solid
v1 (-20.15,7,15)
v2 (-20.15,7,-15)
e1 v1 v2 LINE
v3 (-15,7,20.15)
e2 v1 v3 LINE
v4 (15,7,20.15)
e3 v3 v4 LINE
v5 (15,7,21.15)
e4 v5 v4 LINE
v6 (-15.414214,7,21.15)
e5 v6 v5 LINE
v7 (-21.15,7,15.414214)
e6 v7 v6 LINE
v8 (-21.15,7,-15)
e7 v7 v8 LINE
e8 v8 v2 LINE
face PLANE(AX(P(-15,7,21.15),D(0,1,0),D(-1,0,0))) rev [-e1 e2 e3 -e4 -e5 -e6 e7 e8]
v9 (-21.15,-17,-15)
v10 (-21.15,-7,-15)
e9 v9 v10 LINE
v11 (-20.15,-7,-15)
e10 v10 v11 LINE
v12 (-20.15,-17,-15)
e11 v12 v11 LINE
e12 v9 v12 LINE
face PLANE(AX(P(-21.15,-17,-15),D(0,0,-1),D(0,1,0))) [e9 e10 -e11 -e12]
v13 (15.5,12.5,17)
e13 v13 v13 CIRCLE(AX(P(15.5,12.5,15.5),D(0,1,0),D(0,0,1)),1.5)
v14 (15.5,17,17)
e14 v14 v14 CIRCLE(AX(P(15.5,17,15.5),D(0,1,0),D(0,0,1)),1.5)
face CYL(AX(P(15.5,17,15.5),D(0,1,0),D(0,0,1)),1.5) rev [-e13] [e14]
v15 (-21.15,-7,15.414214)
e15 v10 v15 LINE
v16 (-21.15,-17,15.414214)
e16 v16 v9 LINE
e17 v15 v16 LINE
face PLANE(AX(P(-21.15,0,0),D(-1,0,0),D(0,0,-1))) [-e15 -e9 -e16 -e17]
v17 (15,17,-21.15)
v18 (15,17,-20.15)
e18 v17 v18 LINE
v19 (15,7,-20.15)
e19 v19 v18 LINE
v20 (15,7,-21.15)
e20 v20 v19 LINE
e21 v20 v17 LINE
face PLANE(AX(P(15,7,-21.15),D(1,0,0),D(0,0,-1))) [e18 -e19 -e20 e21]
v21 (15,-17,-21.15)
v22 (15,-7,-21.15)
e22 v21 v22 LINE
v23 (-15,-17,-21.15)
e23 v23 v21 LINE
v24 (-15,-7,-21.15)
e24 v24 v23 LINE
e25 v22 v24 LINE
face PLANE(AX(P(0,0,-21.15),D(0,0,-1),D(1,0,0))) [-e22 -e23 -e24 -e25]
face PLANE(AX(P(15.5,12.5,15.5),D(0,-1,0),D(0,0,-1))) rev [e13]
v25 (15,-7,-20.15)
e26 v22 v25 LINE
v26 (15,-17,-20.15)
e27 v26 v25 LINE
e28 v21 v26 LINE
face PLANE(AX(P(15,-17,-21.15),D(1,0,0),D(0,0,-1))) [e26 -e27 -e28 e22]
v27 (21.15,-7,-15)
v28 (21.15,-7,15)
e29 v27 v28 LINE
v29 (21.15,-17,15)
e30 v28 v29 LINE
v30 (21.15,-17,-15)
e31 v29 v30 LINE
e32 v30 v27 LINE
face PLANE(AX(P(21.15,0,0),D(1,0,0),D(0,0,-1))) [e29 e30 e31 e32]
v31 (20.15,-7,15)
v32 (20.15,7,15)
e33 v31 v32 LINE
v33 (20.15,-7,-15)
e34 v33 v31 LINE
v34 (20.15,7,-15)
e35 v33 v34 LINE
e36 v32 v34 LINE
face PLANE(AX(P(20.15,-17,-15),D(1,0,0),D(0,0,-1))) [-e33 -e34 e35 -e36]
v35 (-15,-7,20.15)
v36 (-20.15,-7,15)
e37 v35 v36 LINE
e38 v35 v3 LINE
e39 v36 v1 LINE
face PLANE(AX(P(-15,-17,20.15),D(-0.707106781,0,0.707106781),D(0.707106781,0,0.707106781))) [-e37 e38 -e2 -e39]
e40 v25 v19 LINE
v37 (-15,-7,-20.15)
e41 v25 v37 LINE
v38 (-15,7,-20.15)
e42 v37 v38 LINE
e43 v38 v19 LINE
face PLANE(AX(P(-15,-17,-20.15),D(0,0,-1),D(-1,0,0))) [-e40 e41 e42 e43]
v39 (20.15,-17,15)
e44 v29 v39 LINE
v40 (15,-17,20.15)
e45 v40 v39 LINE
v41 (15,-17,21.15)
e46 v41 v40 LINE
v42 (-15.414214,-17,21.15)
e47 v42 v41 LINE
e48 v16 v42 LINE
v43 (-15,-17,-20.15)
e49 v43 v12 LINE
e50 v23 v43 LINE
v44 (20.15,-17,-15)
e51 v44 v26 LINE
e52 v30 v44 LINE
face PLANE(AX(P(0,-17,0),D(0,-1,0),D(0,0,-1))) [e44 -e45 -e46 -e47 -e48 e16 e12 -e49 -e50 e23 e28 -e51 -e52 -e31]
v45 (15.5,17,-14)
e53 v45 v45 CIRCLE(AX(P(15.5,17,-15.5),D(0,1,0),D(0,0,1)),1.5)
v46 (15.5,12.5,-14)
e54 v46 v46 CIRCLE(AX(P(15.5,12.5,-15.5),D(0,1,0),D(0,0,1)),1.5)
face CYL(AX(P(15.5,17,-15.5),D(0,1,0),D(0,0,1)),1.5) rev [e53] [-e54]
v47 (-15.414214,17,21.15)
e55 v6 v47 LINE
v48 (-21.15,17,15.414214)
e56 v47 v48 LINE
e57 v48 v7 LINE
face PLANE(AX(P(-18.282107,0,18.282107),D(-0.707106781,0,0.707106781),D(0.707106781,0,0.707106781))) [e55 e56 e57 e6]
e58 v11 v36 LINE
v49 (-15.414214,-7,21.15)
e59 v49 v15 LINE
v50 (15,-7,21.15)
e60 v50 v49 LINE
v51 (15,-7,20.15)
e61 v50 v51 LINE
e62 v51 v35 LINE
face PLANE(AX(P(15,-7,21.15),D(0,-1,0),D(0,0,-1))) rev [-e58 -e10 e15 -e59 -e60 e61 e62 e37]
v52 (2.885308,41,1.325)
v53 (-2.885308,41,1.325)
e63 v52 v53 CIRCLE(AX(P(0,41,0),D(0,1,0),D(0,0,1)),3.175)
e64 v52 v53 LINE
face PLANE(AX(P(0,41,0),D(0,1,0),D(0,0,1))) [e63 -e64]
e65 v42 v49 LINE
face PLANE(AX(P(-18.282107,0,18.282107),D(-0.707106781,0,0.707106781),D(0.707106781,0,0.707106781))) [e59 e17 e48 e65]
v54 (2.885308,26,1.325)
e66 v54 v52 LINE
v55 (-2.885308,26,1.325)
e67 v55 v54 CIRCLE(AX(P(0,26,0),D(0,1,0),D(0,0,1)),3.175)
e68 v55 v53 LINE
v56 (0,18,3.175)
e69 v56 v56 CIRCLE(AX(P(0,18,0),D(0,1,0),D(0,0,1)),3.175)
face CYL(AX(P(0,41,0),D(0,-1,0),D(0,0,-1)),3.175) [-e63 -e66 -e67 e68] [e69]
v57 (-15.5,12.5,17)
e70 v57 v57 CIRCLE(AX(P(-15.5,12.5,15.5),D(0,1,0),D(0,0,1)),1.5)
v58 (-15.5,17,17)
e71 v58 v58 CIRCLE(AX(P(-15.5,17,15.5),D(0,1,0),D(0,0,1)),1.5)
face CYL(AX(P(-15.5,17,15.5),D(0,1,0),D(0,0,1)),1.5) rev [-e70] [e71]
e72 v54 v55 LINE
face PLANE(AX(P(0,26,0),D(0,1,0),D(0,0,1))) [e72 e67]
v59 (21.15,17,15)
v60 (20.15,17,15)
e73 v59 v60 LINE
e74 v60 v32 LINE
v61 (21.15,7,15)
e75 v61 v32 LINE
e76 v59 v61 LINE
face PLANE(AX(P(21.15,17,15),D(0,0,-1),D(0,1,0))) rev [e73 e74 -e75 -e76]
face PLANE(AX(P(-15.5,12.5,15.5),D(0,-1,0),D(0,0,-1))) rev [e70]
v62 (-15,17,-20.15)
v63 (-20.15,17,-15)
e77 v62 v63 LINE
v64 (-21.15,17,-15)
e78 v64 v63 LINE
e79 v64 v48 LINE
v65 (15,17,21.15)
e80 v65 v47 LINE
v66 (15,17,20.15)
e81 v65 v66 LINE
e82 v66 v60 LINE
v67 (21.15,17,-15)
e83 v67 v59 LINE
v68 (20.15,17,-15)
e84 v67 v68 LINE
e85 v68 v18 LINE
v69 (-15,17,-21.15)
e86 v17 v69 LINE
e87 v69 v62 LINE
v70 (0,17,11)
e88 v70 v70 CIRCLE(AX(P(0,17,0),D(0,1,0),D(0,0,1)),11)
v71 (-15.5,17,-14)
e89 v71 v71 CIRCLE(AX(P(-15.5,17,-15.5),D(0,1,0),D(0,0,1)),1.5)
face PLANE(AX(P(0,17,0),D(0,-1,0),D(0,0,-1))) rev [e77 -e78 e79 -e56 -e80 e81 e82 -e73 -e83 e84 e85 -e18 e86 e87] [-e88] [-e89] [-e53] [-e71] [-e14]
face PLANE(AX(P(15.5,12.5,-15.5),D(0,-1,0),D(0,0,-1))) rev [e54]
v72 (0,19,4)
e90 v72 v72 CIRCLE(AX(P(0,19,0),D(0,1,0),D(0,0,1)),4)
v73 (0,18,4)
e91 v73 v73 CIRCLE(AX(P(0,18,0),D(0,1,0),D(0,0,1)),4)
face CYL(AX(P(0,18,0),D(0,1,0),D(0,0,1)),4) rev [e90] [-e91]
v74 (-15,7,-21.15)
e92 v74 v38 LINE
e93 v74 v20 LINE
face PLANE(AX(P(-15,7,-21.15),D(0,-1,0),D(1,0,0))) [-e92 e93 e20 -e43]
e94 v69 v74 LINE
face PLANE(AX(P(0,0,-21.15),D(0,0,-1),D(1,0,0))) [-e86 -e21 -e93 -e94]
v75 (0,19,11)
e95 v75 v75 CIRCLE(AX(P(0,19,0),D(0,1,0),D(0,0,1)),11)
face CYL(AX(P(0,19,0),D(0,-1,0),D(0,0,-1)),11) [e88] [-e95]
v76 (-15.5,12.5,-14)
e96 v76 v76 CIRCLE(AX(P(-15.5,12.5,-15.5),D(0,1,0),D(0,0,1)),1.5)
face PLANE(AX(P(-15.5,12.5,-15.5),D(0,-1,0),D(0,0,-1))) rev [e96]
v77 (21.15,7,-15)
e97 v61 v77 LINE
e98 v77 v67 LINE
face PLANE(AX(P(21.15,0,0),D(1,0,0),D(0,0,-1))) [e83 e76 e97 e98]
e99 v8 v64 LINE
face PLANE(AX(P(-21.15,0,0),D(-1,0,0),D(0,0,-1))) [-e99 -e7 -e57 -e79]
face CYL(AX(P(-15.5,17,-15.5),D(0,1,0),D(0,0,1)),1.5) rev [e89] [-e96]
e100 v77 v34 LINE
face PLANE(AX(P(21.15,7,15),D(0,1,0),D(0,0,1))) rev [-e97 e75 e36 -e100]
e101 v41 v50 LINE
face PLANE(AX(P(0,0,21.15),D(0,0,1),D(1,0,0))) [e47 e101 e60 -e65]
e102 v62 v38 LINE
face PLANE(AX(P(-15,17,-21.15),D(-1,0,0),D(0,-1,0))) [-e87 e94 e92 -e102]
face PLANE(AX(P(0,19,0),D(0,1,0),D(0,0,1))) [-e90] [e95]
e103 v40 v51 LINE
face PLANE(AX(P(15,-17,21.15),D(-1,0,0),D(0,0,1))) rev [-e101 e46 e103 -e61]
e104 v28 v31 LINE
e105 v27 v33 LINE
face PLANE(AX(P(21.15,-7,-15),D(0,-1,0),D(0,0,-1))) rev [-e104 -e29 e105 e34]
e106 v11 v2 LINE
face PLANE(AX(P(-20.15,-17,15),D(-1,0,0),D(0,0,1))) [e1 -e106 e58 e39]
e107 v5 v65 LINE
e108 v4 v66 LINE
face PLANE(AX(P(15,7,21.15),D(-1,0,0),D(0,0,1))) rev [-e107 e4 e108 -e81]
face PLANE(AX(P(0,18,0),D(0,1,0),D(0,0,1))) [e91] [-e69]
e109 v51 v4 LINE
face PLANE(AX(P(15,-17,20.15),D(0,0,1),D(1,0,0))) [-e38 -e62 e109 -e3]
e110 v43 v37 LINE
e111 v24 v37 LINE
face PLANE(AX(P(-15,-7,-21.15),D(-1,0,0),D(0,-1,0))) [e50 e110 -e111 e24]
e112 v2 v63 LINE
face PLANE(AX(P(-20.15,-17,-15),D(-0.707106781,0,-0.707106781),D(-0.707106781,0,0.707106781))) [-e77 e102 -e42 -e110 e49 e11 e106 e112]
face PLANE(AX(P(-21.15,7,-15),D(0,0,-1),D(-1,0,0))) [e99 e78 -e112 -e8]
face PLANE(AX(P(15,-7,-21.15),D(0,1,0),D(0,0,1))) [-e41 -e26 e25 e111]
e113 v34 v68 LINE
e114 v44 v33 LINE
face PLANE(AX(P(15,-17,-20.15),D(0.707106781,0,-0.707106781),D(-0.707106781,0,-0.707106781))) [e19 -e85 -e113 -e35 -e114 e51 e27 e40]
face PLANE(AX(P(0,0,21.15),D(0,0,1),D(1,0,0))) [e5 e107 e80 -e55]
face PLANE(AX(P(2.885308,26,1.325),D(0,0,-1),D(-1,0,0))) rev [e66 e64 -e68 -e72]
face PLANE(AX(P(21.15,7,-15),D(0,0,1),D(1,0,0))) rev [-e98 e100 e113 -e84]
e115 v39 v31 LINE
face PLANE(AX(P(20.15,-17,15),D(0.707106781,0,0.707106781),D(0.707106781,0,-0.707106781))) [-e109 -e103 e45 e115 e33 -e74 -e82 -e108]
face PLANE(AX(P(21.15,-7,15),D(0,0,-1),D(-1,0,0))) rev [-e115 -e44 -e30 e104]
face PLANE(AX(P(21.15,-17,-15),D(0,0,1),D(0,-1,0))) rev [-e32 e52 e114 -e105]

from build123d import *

# Parameters (mm, degrees)
EXTRUSION1_DEPTH      = 17
EXTRUSION1_DEPTH_BACK = 17
SKETCH2_R             = 11
EXTRUSION3_DEPTH      = 2
SKETCH3_R             = 4
EXTRUSION4_DEPTH      = 1
SKETCH4_R             = 3.175
EXTRUSION5_DEPTH      = 23
SKETCH5_W             = 30
SKETCH5_H             = 10
EXTRUSION6_DEPTH      = 1
SKETCH6_W             = 30
SKETCH6_H             = 10
EXTRUSION7_DEPTH      = 1
SKETCH7_W             = 7.283199846
SKETCH7_H             = 10
EXTRUSION8_DEPTH      = 1
EXTRUSION9_START      = -17
EXTRUSION9_DEPTH      = 10
EXTRUSION9_START_2    = 7
EXTRUSION9_2_DEPTH    = 10
EXTRUSION10_START     = -17
EXTRUSION10_DEPTH     = 10
EXTRUSION10_START_2   = 7
EXTRUSION10_2_DEPTH   = 10
HOLE3_D               = 3
HOLE3_DEPTH           = 4.5
EXTRUSION12_START     = -15
EXTRUSION12_DEPTH     = 15


# Read off the part's stored shape, not the designer's step: Extrusion9, Extrusion10
with BuildPart() as part:
    # Sketch1 → Extrusion1 (new, two sides: drawn at the far end of the back side and taken through both)
    with BuildSketch(Plane(origin=(0, 0, 0), x_dir=(-1, 0, 0), z_dir=(0, 1, 0)).offset(-EXTRUSION1_DEPTH_BACK)):
        Polygon((15, 20.15), (20.15, 15), (20.15, -15), (15, -20.15), (-15, -20.15), (-20.15, -15), (-20.15, 15), (-15, 20.15), align=None)
    extrude(amount=EXTRUSION1_DEPTH + EXTRUSION1_DEPTH_BACK)

    # Sketch2 → Extrusion3 (add)
    with BuildSketch(Plane(origin=(0, 17, 0), x_dir=(-1, 0, 0), z_dir=(0, 1, 0))):
        with Locations(Location((0, 0, 0), (0, 0, 90))):
            Circle(SKETCH2_R)
    extrude(amount=EXTRUSION3_DEPTH)

    # Sketch3 → Extrusion4 (cut)
    with BuildSketch(Plane(origin=(0, 19, 0), x_dir=(-1, 0, 0), z_dir=(0, 1, 0))):
        with Locations(Location((0, 0, 0), (0, 0, 90))):
            Circle(SKETCH3_R)
    extrude(amount=-EXTRUSION4_DEPTH, mode=Mode.SUBTRACT)

    # Sketch4 → Extrusion5 (add)
    with BuildSketch(Plane(origin=(0, 18, 0), x_dir=(-1, 0, 0), z_dir=(0, 1, 0))):
        with Locations(Location((0, 0, 0), (0, 0, 90))):
            Circle(SKETCH4_R)
    extrude(amount=EXTRUSION5_DEPTH)

    # Sketch5 → Extrusion6 (add)
    with BuildSketch(Plane.XY.offset(20.15)):
        with Locations((0, 12)):
            Rectangle(SKETCH5_W, SKETCH5_H)
        with Locations((0, -12)):
            Rectangle(SKETCH5_W, SKETCH5_H)
    extrusion6 = extrude(amount=EXTRUSION6_DEPTH)

    # Mirror1: Extrusion6 across plane
    add(extrusion6.mirror(Plane.XY))

    # Sketch6 → Extrusion7 (add)
    with BuildSketch(Plane(origin=(20.15, 0, 0), x_dir=(0, 0, -1), z_dir=(1, 0, 0))):
        with Locations((0, 12)):
            Rectangle(SKETCH6_W, SKETCH6_H)
        with Locations((0, -12)):
            Rectangle(SKETCH6_W, SKETCH6_H)
    extrusion7 = extrude(amount=EXTRUSION7_DEPTH)

    # Mirror2: Extrusion7 across plane
    add(extrusion7.mirror(Plane(origin=(0, 0, 0), x_dir=(0, 0, 1), z_dir=(1, 0, 0))))

    # Sketch7 → Extrusion8 (add)
    with BuildSketch(Plane(origin=(-17.575, 0, 17.575), x_dir=(0.7071067811865475, 0, 0.7071067811865477), z_dir=(-0.7071067811865477, 0, 0.7071067811865475))):
        with Locations((0, 12)):
            Rectangle(SKETCH7_W, SKETCH7_H)
        with Locations((0, -12)):
            Rectangle(SKETCH7_W, SKETCH7_H)
    extrude(amount=EXTRUSION8_DEPTH)

    # Extrusion9 outline → Extrusion9 (add)
    with BuildSketch(Plane(origin=(0, 0, 0), x_dir=(1, 0, 0), z_dir=(0, 1, 0)).offset(EXTRUSION9_START)):
        Polygon((-15.414213562, -21.15), (-15, -21.15), (-15, -20.15), (-15.707106781, -20.857106781), align=None)
    extrude(amount=EXTRUSION9_DEPTH)

    # Extrusion9 2 outline → Extrusion9 2 (add)
    with BuildSketch(Plane(origin=(0, 0, 0), x_dir=(1, 0, 0), z_dir=(0, 1, 0)).offset(EXTRUSION9_START_2)):
        Polygon((-15.414213562, -21.15), (-15, -21.15), (-15, -20.15), (-15.707106781, -20.857106781), align=None)
    extrude(amount=EXTRUSION9_2_DEPTH)

    # Extrusion10 outline → Extrusion10 (add)
    with BuildSketch(Plane(origin=(0, 0, 0), x_dir=(1, 0, 0), z_dir=(0, 1, 0)).offset(EXTRUSION10_START)):
        Polygon((-20.15, -15), (-21.15, -15), (-21.15, -15.414213562), (-20.857106781, -15.707106781), align=None)
    extrude(amount=EXTRUSION10_DEPTH)

    # Extrusion10 2 outline → Extrusion10 2 (add)
    with BuildSketch(Plane(origin=(0, 0, 0), x_dir=(1, 0, 0), z_dir=(0, 1, 0)).offset(EXTRUSION10_START_2)):
        Polygon((-20.15, -15), (-21.15, -15), (-21.15, -15.414213562), (-20.857106781, -15.707106781), align=None)
    extrude(amount=EXTRUSION10_2_DEPTH)

    # Hole3
    with Locations(Plane(origin=(0, 17, 0), x_dir=(1, 0, 0), z_dir=(0, 1, 0))):
        with Locations((-15.5, -15.5), (-15.5, 15.5), (15.5, 15.5), (15.5, -15.5)):
            Hole(HOLE3_D / 2, depth=HOLE3_DEPTH)

    # Sketch12 → Extrusion12 (cut)
    with BuildSketch(Plane(origin=(0, 41, 0), x_dir=(-1, 0, 0), z_dir=(0, 1, 0)).offset(EXTRUSION12_START)):
        with BuildLine():
            Line((-2.885307609, 1.325), (2.885307609, 1.325))
            ThreePointArc((2.885307609, 1.325), (0, 3.175), (-2.885307609, 1.325))
        make_face()
    extrude(amount=EXTRUSION12_DEPTH, mode=Mode.SUBTRACT)


solid = part.part
